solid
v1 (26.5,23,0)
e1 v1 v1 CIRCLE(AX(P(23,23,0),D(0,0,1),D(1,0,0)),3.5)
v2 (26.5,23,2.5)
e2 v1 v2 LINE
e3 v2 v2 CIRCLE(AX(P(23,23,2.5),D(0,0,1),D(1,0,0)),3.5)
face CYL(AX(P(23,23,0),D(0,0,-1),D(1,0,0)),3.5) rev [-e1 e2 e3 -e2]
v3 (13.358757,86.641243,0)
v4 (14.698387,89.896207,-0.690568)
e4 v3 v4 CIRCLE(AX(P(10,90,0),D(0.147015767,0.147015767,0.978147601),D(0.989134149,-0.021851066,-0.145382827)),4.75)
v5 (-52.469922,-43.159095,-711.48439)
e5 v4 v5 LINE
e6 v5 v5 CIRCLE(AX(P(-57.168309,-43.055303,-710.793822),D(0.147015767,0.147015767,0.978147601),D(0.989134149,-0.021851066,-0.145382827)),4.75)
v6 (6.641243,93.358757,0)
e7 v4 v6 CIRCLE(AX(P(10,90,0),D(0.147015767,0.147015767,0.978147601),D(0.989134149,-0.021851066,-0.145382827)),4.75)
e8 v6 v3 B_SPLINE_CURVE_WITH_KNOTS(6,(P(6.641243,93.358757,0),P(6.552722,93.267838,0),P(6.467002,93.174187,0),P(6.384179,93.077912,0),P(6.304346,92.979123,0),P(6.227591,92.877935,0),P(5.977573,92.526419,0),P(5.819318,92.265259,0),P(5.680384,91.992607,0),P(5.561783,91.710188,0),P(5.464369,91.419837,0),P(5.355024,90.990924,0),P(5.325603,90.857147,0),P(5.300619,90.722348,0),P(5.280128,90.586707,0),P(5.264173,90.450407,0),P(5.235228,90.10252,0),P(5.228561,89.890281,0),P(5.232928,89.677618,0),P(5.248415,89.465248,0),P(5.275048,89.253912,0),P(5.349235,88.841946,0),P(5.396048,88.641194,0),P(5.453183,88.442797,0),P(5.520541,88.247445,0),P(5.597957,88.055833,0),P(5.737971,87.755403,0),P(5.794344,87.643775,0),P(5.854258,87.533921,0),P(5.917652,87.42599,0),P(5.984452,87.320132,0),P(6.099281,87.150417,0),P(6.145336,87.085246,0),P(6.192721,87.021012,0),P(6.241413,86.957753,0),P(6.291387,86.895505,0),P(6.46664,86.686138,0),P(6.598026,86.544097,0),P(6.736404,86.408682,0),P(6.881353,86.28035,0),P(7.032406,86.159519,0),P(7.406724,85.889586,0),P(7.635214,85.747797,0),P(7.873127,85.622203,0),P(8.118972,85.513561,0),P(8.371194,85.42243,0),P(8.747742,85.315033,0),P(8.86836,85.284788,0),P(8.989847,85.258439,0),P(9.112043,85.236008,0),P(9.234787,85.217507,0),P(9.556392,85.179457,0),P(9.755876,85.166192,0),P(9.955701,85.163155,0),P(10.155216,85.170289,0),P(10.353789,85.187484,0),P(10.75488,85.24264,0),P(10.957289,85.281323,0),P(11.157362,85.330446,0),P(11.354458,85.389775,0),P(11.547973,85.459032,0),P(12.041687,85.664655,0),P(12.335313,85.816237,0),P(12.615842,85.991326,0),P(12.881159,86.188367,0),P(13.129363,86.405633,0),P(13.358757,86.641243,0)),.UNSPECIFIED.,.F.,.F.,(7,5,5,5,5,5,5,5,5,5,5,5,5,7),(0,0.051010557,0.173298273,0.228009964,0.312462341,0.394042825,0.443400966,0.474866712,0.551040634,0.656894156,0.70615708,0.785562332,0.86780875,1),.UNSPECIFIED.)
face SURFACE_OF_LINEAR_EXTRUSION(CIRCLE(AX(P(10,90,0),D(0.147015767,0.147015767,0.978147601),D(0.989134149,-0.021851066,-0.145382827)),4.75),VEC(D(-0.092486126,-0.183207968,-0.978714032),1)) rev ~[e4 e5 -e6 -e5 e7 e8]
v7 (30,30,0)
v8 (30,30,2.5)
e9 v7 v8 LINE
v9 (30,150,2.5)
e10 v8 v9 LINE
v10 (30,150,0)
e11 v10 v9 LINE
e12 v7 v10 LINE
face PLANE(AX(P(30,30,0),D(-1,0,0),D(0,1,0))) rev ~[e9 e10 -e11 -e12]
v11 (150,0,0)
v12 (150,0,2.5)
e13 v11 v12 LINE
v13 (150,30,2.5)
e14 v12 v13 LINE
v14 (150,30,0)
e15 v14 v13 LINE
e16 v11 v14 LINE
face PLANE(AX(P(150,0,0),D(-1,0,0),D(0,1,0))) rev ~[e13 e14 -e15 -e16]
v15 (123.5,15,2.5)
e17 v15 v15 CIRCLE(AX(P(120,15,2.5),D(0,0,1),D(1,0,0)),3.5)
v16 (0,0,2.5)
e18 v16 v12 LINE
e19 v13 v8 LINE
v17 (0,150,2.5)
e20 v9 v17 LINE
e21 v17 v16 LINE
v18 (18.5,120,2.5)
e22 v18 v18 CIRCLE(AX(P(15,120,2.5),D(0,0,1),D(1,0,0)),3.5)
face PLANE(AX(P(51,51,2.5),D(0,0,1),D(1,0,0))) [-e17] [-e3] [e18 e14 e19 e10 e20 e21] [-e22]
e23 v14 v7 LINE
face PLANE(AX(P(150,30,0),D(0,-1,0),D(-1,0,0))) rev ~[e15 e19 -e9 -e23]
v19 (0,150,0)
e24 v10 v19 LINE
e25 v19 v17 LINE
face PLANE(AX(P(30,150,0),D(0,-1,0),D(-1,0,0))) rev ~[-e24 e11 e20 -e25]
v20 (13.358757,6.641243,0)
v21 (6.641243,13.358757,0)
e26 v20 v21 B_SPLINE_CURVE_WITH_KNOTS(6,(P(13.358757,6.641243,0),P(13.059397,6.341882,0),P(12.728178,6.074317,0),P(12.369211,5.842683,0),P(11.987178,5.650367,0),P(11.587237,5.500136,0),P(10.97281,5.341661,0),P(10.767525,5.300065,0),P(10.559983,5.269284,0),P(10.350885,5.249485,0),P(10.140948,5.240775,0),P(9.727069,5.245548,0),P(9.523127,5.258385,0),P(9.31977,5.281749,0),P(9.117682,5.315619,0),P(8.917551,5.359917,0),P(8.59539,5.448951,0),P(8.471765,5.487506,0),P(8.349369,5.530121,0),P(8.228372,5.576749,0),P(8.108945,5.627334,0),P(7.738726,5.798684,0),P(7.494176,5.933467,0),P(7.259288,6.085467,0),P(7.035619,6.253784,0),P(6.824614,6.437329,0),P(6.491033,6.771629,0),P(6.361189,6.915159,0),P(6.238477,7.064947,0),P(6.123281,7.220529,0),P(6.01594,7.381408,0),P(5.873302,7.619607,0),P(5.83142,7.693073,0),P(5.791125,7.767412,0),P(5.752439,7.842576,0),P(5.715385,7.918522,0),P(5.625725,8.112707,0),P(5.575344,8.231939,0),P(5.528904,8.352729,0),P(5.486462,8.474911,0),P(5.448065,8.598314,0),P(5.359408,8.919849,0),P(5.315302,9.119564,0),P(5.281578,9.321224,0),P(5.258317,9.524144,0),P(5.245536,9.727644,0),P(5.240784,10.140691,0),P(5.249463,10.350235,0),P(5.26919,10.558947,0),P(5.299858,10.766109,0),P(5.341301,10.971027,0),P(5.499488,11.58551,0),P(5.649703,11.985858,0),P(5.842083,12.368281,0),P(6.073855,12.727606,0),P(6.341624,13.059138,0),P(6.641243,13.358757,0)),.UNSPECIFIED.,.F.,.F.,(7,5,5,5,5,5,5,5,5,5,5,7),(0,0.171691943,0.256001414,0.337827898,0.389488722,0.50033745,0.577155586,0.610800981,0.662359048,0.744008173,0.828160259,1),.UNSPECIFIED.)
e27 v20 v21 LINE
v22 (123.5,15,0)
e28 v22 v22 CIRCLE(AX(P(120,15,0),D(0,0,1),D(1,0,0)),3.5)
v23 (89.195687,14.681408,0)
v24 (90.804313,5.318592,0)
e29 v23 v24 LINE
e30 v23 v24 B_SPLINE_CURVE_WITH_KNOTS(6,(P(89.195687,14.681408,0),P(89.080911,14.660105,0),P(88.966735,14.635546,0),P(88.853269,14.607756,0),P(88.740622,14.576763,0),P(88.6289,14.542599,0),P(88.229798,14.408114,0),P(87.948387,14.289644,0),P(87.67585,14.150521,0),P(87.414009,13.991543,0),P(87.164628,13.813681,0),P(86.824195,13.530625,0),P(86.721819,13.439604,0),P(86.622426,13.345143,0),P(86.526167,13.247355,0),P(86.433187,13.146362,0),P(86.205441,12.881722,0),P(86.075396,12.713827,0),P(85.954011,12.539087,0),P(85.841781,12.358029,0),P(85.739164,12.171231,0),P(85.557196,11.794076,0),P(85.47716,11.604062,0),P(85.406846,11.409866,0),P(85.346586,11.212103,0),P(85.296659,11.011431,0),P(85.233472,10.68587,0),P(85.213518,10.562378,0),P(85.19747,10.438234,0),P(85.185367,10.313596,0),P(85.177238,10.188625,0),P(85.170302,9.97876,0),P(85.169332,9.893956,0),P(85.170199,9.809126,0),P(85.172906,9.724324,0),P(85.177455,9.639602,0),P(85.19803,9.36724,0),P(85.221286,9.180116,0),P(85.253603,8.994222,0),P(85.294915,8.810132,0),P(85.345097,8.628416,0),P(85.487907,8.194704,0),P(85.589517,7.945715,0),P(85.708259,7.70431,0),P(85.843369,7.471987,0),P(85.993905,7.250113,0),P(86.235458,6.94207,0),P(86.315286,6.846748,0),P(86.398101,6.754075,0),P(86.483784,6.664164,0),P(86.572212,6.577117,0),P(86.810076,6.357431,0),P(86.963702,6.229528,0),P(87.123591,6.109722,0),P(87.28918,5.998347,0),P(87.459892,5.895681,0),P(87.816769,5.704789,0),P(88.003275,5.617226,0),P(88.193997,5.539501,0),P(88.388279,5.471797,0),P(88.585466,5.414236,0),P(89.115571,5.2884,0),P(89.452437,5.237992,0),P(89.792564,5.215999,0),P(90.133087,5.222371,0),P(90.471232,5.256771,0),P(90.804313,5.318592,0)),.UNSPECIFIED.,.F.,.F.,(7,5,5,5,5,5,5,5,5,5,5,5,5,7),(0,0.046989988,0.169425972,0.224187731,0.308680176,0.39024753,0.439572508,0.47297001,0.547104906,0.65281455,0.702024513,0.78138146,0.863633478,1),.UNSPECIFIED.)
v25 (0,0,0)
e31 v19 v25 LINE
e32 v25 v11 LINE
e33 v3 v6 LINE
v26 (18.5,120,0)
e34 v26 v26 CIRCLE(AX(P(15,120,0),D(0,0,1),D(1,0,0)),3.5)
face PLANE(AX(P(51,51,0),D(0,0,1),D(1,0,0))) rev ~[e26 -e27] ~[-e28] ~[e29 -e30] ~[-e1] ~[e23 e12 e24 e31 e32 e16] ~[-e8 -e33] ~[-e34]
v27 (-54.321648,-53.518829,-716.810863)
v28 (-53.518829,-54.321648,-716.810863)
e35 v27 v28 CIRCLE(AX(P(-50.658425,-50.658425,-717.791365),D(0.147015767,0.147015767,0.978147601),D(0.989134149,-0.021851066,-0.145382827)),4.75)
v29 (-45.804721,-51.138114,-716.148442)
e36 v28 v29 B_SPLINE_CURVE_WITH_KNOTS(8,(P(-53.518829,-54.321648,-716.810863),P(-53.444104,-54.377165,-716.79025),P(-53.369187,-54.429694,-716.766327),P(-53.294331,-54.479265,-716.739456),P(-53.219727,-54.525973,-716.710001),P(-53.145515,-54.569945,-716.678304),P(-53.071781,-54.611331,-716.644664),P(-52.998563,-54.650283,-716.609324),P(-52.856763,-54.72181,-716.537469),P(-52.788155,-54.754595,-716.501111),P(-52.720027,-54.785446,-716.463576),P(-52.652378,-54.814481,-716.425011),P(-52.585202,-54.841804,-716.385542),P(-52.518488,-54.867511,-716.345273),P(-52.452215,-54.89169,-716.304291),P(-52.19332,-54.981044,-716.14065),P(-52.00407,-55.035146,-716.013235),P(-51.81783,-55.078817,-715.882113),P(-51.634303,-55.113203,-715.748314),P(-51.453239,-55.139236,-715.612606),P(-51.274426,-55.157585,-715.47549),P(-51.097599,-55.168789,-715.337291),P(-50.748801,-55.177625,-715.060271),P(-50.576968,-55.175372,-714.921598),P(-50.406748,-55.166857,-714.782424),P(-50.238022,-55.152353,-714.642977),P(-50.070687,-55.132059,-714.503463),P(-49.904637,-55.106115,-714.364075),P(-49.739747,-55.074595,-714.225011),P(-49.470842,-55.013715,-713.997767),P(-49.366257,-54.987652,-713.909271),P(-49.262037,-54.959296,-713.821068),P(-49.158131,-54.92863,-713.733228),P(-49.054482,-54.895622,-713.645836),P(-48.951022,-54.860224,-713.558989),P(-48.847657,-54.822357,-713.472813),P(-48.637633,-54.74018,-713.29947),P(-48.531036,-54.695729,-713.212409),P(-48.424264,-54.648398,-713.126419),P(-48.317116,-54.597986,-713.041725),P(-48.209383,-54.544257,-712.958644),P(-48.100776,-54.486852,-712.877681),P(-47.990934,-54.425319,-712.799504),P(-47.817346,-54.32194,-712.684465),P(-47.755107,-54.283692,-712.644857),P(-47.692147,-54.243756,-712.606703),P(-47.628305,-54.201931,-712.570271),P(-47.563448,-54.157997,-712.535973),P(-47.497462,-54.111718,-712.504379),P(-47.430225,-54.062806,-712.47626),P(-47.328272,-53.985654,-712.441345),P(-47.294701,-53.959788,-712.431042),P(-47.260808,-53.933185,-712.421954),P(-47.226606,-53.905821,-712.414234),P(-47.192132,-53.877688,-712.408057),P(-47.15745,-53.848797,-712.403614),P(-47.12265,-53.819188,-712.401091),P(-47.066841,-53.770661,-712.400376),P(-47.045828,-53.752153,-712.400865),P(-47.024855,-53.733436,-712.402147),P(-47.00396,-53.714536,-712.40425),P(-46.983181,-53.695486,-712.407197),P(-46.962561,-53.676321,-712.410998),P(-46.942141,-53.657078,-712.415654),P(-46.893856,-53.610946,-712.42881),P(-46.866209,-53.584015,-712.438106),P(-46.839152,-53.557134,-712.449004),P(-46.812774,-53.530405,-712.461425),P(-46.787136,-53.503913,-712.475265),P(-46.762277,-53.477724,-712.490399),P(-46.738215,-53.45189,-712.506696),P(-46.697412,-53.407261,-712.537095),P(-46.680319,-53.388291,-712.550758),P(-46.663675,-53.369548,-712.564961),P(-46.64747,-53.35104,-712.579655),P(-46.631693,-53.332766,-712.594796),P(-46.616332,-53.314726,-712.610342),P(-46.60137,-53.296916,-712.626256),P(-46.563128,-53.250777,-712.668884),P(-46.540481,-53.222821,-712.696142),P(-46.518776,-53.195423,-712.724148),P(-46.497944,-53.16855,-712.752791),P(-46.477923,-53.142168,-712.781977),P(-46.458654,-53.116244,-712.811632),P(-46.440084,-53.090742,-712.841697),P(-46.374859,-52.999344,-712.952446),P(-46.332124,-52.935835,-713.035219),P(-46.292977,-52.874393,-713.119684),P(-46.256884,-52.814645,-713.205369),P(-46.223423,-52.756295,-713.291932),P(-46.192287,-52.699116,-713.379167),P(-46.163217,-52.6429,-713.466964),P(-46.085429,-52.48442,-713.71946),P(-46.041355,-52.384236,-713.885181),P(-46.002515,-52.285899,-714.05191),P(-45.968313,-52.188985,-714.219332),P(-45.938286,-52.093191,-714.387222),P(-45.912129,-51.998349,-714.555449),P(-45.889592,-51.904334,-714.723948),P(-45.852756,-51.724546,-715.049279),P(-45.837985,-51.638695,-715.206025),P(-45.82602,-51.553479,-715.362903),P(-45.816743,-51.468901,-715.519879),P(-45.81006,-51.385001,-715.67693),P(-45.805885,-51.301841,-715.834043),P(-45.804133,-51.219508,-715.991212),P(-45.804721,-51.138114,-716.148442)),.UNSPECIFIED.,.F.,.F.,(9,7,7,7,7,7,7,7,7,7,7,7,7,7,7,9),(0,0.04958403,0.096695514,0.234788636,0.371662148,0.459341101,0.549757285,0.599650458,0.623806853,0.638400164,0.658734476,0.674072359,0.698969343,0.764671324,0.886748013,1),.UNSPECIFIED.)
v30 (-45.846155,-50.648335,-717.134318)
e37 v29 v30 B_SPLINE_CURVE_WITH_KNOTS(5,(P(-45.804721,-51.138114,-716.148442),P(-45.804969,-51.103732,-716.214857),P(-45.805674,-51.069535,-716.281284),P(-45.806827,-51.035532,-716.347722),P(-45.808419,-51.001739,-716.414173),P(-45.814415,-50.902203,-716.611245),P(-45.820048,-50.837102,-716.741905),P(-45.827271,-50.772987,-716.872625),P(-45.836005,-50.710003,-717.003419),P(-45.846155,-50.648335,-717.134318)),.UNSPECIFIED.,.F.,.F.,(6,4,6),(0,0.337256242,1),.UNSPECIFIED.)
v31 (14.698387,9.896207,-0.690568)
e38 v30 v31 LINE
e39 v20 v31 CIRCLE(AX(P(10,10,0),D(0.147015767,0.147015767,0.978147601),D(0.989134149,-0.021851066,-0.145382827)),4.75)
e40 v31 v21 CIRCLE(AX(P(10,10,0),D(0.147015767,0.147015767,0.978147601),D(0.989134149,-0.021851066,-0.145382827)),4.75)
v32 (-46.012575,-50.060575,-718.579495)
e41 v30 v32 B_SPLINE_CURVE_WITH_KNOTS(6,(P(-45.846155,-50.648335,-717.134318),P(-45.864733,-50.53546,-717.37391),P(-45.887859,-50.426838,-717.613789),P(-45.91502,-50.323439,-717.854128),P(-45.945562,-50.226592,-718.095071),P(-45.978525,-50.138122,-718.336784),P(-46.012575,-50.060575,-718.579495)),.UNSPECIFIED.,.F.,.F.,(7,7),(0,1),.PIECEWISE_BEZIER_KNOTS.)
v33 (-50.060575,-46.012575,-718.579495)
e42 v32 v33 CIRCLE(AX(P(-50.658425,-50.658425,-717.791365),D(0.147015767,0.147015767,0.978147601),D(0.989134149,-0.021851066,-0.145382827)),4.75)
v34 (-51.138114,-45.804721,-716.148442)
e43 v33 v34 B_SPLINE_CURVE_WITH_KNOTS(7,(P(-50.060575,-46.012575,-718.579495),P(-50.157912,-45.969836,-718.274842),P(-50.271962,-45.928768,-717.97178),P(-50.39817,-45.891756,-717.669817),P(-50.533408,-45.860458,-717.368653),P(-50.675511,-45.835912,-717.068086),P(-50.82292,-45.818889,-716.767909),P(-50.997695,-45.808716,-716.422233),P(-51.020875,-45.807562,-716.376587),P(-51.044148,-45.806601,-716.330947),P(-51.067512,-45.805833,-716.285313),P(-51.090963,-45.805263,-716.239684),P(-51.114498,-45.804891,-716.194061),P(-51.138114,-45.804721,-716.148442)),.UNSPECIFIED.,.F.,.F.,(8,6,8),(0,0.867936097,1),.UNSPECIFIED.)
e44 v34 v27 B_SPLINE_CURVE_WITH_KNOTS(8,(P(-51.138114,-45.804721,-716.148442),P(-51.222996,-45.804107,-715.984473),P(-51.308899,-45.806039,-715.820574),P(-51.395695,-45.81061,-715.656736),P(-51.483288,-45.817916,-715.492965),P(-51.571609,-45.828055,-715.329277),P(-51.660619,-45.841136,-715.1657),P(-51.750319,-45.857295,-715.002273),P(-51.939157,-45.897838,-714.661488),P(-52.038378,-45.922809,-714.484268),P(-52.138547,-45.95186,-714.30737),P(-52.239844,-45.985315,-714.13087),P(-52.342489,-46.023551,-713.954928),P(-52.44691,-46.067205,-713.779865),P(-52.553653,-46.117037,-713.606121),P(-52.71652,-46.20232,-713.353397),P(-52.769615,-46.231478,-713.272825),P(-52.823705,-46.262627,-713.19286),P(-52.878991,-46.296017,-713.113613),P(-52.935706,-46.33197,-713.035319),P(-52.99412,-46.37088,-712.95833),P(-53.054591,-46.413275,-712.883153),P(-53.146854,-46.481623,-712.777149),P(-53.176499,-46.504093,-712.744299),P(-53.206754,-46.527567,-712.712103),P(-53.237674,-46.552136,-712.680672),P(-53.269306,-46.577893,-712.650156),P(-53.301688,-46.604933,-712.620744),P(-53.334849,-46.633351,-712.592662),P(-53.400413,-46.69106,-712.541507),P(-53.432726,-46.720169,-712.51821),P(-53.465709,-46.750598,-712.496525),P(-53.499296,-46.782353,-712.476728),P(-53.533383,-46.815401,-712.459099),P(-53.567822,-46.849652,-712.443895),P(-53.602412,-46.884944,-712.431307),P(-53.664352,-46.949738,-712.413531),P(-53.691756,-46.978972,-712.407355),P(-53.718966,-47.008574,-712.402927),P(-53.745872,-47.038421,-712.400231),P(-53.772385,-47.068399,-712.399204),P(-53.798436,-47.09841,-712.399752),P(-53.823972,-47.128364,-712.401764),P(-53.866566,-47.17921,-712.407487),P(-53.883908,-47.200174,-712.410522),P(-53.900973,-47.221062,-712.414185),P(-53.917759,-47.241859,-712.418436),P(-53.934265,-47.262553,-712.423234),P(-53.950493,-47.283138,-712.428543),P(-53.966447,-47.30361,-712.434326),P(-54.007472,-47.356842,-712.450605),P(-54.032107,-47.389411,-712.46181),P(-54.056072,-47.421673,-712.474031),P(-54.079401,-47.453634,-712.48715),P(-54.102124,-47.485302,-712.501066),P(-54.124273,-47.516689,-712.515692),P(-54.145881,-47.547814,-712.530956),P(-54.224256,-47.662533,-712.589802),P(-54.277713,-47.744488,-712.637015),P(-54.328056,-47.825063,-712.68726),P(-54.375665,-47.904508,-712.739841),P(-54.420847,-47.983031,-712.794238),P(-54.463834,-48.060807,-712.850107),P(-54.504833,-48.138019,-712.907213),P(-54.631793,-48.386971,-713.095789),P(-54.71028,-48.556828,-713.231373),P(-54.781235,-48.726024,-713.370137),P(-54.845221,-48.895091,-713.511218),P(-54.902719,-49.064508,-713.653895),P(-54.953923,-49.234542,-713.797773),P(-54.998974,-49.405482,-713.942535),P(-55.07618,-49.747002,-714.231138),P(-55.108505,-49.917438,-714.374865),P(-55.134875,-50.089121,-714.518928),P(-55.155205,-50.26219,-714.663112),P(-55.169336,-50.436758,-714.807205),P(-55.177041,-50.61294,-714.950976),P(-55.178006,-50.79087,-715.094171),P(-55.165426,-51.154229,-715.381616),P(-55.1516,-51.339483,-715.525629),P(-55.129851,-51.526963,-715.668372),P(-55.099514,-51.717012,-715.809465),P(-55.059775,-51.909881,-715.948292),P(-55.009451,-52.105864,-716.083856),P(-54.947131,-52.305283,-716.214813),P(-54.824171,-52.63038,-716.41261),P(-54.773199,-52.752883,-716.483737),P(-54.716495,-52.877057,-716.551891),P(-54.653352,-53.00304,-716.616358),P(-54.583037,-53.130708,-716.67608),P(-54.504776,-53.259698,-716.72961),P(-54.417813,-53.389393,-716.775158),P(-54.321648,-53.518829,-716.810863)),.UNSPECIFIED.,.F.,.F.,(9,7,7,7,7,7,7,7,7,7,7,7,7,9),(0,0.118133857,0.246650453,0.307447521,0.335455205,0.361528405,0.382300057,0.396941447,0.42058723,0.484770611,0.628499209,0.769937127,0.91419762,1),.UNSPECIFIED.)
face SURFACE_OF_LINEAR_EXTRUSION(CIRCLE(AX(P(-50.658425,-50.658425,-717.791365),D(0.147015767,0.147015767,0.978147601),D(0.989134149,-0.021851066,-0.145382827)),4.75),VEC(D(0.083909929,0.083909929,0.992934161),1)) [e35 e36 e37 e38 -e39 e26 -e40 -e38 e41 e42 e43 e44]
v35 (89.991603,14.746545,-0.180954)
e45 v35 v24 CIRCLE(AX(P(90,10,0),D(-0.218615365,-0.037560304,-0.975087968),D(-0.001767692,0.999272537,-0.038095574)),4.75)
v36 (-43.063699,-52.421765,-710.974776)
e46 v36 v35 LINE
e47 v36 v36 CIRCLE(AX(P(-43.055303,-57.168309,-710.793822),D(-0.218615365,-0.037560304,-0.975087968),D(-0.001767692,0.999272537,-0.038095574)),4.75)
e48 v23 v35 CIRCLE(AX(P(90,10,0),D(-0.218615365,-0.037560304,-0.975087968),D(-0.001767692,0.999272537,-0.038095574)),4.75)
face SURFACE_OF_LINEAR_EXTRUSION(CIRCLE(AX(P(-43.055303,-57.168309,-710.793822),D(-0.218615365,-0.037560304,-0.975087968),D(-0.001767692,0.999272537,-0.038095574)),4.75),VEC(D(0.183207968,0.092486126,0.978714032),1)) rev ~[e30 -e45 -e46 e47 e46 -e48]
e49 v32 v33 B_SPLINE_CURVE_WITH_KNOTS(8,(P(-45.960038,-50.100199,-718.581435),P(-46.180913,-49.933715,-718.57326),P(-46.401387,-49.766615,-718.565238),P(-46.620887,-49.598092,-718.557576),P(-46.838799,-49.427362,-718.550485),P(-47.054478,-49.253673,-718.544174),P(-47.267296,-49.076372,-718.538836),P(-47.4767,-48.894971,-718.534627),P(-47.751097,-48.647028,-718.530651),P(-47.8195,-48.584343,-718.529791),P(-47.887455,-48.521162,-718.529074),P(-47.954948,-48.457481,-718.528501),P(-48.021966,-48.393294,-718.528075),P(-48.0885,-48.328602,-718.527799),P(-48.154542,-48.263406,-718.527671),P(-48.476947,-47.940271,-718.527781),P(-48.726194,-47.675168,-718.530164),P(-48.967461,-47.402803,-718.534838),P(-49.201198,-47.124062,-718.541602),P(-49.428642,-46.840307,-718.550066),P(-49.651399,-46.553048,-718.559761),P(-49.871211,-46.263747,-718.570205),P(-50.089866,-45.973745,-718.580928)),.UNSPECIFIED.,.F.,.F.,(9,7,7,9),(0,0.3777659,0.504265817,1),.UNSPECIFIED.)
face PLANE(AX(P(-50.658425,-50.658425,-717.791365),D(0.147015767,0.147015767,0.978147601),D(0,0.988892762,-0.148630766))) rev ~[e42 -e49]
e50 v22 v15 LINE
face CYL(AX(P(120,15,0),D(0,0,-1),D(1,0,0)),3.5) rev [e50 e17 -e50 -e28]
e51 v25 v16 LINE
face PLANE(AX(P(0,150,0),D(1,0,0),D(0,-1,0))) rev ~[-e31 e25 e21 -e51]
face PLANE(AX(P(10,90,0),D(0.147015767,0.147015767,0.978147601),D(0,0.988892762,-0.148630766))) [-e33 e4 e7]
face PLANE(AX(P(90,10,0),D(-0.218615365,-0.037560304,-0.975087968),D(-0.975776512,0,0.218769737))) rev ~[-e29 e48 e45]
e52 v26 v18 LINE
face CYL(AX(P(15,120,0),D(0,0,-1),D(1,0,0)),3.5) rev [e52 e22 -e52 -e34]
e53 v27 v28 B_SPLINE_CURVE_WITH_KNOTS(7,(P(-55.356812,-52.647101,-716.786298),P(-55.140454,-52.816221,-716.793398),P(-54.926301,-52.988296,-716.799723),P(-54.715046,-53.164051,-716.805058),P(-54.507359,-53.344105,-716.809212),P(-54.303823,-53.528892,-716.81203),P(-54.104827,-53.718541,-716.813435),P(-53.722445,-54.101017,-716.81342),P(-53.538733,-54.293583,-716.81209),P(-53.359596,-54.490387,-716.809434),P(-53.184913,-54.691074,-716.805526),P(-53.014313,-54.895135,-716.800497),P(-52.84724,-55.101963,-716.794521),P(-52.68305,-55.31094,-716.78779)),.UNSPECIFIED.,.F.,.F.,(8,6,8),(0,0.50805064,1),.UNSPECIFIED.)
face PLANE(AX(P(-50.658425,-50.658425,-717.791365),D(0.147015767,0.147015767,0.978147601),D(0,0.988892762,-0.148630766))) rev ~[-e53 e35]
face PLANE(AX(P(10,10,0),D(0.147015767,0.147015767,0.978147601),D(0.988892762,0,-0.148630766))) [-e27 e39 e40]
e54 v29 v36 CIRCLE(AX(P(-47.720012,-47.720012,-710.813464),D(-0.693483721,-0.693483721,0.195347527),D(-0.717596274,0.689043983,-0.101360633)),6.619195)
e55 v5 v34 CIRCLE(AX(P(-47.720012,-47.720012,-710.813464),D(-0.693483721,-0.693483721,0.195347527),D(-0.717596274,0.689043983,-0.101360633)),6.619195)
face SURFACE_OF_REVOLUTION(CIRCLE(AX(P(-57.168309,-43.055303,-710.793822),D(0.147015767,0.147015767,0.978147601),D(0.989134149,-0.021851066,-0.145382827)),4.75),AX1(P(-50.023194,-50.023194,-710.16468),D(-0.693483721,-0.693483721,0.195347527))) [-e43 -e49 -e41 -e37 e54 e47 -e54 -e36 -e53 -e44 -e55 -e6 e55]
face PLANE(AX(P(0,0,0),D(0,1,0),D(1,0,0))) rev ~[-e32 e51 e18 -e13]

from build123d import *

# Parameters (mm, degrees)
F0_R     = 4.75
F0_R_2   = 3.5
F1_DEPTH = 2.5
F9_R     = 4.75
F15_R    = 4.75


with BuildPart() as f1:
    # F0 (on Top) → F1 (new body)
    with BuildSketch(Plane.XY):
        Polygon((0, 150), (0, 0), (150, 0), (150, 10), (150, 30), (30, 30), (30, 150), (10, 150), align=None)
        with Locations((10, 10)):
            Circle(F0_R, mode=Mode.SUBTRACT)
        with Locations((23, 23)):
            Circle(F0_R_2, mode=Mode.SUBTRACT)
        with Locations((90, 10)):
            Circle(F0_R, mode=Mode.SUBTRACT)
        with Locations((120, 15)):
            Circle(F0_R_2, mode=Mode.SUBTRACT)
        with Locations((10, 90)):
            Circle(F0_R, mode=Mode.SUBTRACT)
        with Locations((15, 120)):
            Circle(F0_R_2, mode=Mode.SUBTRACT)
        with Locations((10, 10)):
            Circle(F0_R)
        with Locations((90, 10)):
            Circle(F0_R)
        with Locations((10, 90)):
            Circle(F0_R)
    extrude(amount=F1_DEPTH)

    # F10: sweep along a path in F7
    with BuildLine(Plane(origin=(48.0919671818, 48.0919671818, -13.547033009), x_dir=(0.6675061276, -0.7204722952, -0.1880298951), z_dir=(-0.6934837214, -0.6934837214, 0.1953475271))) as f10_path:
        Line((-58.167445294, 2.7113815263), (126.5104437071, -699.6683088087))
        ThreePointArc((126.5104437071, -699.6683088087), (138.0989635142, -706.9399112936), (146.0989923214, -695.8417342765))
        Line((146.0989923214, -695.8417342765), (52.8708285308, 24.4024337369))
    # F9 (on face) → F10 (sweep)
    with BuildSketch(Plane(origin=(2.1613635589, 2.1613635589, 14.3803119238), x_dir=(0.9891341488, -0.021851066, -0.1453828274), z_dir=(0.1470157665, 0.1470157665, 0.9781476007))):
        with Locations((7.9247455466, 89.0003486068)):
            Circle(F9_R)
    sweep(path=f10_path.line)

    # F16: sweep along a path in F13
    with BuildLine(Plane(origin=(9.859182476, 9.859182476, -1.6663407002), x_dir=(0.6922921751, -0.7120680278, -0.1170071282), z_dir=(-0.7021104783, -0.7021104783, 0.1186665597))) as f16_path:
        Line((84.9885198539, -716.1960374869), (-0.1977585265, 1.6665059389))
    # F15 (on face) → F16 (sweep)
    with BuildSketch(Plane(origin=(0.4322727118, 0.4322727118, 2.8760623848), x_dir=(0.9891341488, -0.021851066, -0.1453828274), z_dir=(0.1470157665, 0.1470157665, 0.9781476007))):
        with Locations((9.6728308282, 9.888927623)):
            Circle(F15_R)
    sweep(path=f16_path.line)


solid = f1.part
